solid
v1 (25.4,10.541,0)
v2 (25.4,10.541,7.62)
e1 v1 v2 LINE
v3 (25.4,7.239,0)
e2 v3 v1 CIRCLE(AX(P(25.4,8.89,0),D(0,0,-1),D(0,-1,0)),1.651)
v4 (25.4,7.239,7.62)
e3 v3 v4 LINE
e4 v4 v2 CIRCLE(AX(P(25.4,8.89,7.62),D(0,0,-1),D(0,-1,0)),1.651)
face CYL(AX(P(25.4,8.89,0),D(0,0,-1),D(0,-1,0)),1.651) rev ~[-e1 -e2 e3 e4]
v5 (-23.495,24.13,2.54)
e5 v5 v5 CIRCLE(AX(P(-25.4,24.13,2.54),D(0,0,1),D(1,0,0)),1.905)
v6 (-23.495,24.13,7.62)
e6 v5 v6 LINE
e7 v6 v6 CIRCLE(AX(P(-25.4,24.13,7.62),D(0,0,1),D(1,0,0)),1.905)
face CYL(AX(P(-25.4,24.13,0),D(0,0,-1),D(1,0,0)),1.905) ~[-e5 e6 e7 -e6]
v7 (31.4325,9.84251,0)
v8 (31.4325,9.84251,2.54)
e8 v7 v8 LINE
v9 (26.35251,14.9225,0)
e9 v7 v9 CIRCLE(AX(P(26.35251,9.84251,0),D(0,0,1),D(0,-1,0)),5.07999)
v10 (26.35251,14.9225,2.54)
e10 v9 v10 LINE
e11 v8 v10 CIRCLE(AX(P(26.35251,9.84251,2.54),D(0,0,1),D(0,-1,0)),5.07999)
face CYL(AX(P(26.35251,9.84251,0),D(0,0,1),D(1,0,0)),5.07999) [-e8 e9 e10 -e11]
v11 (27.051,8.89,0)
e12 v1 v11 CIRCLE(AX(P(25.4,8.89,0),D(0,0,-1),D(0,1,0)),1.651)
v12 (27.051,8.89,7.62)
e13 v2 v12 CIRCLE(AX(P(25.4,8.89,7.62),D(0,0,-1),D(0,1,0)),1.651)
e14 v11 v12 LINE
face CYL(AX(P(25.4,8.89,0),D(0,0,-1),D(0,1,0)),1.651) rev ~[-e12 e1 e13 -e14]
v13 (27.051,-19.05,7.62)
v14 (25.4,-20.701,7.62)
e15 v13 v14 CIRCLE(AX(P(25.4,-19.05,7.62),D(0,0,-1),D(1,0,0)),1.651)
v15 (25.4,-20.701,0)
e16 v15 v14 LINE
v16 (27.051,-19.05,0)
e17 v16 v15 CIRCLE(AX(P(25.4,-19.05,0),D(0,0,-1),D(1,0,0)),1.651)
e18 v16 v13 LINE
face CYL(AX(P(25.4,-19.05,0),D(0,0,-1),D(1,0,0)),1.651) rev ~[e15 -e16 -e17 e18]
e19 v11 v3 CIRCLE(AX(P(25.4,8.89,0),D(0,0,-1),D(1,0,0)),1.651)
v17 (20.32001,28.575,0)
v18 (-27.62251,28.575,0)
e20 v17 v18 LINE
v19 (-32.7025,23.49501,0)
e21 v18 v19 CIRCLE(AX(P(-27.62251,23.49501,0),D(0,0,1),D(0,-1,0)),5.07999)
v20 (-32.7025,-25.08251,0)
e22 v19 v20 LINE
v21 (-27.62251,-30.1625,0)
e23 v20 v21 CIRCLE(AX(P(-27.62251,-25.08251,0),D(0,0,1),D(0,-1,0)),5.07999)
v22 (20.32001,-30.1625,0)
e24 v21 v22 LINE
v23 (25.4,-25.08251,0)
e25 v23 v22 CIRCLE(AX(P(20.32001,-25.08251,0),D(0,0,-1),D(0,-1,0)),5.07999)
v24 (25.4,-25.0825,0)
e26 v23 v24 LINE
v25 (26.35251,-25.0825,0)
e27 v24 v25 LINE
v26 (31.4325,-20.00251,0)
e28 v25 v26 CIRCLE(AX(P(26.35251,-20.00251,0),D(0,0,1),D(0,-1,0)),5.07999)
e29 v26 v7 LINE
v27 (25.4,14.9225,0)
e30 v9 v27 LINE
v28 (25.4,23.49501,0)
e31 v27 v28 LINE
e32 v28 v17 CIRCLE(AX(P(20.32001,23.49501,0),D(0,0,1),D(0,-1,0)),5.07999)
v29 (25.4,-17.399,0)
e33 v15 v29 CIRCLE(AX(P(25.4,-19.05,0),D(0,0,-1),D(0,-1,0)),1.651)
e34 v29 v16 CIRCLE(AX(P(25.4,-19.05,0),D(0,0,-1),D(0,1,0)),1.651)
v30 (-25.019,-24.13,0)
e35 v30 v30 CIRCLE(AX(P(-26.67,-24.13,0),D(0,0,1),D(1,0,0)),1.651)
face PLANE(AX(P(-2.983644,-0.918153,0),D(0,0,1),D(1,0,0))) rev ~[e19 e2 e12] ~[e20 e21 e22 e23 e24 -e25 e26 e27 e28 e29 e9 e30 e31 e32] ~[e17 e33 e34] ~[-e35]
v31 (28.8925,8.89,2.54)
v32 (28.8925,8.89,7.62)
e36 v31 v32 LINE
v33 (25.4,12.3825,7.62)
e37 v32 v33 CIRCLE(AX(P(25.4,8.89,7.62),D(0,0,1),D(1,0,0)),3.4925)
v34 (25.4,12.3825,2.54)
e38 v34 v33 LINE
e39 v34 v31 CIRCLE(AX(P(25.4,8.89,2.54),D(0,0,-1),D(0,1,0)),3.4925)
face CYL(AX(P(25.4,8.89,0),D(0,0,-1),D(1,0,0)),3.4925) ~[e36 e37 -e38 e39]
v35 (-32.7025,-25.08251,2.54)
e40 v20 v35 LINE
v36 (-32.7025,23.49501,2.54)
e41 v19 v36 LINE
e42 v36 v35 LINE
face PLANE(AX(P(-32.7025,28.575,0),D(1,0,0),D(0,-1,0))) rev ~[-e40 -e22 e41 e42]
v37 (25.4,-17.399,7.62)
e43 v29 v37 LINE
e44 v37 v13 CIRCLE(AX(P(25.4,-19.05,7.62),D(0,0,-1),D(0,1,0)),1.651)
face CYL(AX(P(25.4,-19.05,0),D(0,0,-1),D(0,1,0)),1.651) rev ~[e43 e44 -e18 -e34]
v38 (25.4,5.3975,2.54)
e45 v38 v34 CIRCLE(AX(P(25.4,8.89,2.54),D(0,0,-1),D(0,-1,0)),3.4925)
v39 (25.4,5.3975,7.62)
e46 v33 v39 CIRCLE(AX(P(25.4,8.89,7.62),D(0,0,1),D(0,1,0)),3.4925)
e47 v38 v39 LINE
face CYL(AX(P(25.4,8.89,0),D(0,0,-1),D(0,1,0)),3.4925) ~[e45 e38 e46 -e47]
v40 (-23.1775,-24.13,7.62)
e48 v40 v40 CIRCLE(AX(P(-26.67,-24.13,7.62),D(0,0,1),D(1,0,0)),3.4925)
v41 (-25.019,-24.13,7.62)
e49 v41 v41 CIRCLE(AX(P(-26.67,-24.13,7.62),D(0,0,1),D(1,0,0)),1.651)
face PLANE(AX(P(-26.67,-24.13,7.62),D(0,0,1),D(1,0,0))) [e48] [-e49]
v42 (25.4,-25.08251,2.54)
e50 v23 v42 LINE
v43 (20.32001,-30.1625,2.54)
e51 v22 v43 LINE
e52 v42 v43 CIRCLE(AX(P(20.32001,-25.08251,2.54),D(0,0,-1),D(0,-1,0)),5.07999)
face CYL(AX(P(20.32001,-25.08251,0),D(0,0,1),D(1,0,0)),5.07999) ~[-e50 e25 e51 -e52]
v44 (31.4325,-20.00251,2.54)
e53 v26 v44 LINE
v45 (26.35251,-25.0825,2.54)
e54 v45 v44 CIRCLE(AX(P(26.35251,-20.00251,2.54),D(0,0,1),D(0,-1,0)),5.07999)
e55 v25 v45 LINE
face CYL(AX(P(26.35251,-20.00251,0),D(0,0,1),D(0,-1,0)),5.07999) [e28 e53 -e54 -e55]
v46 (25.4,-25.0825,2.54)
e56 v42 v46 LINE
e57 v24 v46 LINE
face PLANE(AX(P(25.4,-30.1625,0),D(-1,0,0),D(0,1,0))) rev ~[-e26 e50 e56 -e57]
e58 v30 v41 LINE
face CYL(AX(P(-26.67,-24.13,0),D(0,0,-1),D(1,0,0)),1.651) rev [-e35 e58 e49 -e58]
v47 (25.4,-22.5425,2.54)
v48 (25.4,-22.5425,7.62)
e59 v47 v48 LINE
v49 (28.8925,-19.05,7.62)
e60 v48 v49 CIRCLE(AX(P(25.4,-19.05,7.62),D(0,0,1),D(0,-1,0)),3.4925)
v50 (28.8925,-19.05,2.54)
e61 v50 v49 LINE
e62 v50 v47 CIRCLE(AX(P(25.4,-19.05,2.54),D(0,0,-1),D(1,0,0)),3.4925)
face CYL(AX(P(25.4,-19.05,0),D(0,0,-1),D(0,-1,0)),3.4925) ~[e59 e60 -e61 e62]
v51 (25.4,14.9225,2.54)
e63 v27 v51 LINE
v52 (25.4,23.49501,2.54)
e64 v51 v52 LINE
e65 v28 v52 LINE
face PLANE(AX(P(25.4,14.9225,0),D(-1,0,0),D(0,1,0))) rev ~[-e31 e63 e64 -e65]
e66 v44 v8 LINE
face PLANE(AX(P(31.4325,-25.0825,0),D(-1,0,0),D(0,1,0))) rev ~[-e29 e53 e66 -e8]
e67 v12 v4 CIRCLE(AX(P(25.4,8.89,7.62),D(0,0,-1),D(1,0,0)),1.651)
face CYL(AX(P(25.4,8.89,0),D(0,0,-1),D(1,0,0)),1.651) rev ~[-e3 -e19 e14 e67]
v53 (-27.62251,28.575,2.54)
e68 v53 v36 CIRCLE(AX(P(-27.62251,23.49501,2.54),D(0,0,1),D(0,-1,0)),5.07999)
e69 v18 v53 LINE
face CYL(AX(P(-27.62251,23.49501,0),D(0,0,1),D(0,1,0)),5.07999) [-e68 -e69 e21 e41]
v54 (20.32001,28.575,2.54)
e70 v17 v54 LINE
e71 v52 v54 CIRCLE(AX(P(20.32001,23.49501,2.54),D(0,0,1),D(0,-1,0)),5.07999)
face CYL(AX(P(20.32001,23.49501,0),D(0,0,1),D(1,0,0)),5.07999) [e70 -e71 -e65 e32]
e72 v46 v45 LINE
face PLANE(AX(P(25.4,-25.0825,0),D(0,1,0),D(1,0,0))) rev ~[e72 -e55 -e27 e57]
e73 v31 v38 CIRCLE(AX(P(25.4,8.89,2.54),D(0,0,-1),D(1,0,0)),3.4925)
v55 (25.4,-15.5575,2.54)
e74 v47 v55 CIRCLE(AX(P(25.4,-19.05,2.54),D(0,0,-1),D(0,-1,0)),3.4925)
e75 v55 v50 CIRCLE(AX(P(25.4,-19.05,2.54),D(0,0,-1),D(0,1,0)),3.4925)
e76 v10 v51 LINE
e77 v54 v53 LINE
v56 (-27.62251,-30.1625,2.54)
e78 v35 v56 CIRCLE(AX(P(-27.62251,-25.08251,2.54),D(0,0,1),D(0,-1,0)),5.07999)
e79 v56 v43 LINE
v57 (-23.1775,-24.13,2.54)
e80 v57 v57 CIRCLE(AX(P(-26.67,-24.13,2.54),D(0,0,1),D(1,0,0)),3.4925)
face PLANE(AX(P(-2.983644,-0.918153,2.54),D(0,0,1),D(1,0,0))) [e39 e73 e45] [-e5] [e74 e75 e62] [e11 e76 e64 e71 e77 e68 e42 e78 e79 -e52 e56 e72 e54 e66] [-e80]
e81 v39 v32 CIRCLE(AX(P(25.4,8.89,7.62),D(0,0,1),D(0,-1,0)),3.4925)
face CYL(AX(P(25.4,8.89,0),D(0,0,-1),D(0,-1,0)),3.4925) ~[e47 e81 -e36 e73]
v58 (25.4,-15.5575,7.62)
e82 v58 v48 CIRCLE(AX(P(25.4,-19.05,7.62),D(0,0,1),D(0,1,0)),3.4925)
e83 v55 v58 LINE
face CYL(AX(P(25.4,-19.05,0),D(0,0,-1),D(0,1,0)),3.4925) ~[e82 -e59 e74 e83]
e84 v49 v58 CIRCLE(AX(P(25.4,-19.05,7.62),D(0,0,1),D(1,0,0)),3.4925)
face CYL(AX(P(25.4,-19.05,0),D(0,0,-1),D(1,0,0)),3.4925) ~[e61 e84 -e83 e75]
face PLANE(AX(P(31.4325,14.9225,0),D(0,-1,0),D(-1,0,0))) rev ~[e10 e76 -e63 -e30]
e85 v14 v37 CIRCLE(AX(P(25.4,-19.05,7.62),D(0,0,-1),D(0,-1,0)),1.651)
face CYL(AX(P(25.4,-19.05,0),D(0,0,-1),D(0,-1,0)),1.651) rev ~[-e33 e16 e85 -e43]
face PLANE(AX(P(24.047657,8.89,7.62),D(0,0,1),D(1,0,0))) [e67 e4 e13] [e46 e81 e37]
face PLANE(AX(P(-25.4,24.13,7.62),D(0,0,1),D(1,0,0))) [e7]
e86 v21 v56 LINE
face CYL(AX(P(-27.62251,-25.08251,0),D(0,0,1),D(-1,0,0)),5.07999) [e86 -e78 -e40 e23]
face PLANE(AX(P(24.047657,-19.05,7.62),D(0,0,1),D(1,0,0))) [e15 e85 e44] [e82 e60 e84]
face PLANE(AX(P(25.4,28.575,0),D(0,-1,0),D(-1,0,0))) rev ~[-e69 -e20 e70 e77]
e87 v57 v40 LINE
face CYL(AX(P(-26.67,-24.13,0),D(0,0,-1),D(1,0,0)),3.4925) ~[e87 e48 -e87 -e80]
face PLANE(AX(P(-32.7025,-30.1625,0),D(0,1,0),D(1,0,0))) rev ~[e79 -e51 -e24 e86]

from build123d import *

# Parameters (mm, degrees)
F1_R     = 3.4925
F1_R_2   = 1.905
F2_DEPTH = 2.54
F1_R_3   = 1.651
F3_DEPTH = 7.62
F4_R     = 5.07999


# Not quite as in the source:
# - a fillet or chamfer is up to 0.001 mm smaller than in the source, because OpenCascade refuses the exact size


with BuildPart() as f2:
    # F1 (on Top) → F2 (new body)
    with BuildSketch(Plane.XY):
        with BuildLine():
            ThreePointArc((25.4, -22.5425), (21.9075, -19.05), (25.4, -15.5575))
            Line((25.4, -15.5575), (25.4, 5.3975))
            ThreePointArc((25.4, 5.3975), (21.9075, 8.89), (25.4, 12.3825))
            Line((25.4, 12.3825), (25.4, 14.9225))
            Line((25.4, 14.9225), (25.4, 28.575))
            Line((25.4, 28.575), (-32.7025, 28.575))
            Line((-32.7025, 28.575), (-32.7025, -30.1625))
            Line((-32.7025, -30.1625), (25.4, -30.1625))
            Line((25.4, -30.1625), (25.4, -25.0825))
            Line((25.4, -25.0825), (25.4, -22.5425))
        make_face()
        with Locations((-26.67, -24.13)):
            Circle(F1_R, mode=Mode.SUBTRACT)
        with Locations((-25.4, 24.13)):
            Circle(F1_R_2, mode=Mode.SUBTRACT)
        with BuildLine():
            ThreePointArc((25.4, -15.5575), (27.8695704333, -16.5804295667), (28.8925, -19.05))
            ThreePointArc((28.8925, -19.05), (27.8695704333, -21.5195704333), (25.4, -22.5425))
            Line((25.4, -22.5425), (25.4, -25.0825))
            Line((25.4, -25.0825), (31.4325, -25.0825))
            Line((31.4325, -25.0825), (31.4325, 14.9225))
            Line((31.4325, 14.9225), (25.4, 14.9225))
            Line((25.4, 14.9225), (25.4, 12.3825))
            ThreePointArc((25.4, 12.3825), (27.8695704333, 11.3595704333), (28.8925, 8.89))
            ThreePointArc((28.8925, 8.89), (27.8695704333, 6.4204295667), (25.4, 5.3975))
            Line((25.4, 5.3975), (25.4, -15.5575))
        make_face()
    extrude(amount=F2_DEPTH)

    # F1 (on Top) → F3 (join)
    with BuildSketch(Plane.XY):
        with Locations((-26.67, -24.13)):
            Circle(F1_R)
        with Locations((-26.67, -24.13)):
            Circle(F1_R_3, mode=Mode.SUBTRACT)
        with Locations((-25.4, 24.13)):
            Circle(F1_R_2)
        with BuildLine():
            ThreePointArc((25.4, 12.3825), (21.9075, 8.89), (25.4, 5.3975))
            Line((25.4, 5.3975), (25.4, 7.239))
            ThreePointArc((25.4, 7.239), (23.749, 8.89), (25.4, 10.541))
            Line((25.4, 10.541), (25.4, 12.3825))
        make_face()
        with BuildLine():
            Line((25.4, 7.239), (25.4, 5.3975))
            ThreePointArc((25.4, 5.3975), (27.8695704333, 6.4204295667), (28.8925, 8.89))
            ThreePointArc((28.8925, 8.89), (27.8695704333, 11.3595704333), (25.4, 12.3825))
            Line((25.4, 12.3825), (25.4, 10.541))
            ThreePointArc((25.4, 10.541), (26.5674332957, 10.0574332957), (27.051, 8.89))
            ThreePointArc((27.051, 8.89), (26.5674332957, 7.7225667043), (25.4, 7.239))
        make_face()
        with BuildLine():
            Line((25.4, -17.399), (25.4, -15.5575))
            ThreePointArc((25.4, -15.5575), (21.9075, -19.05), (25.4, -22.5425))
            Line((25.4, -22.5425), (25.4, -20.701))
            ThreePointArc((25.4, -20.701), (23.749, -19.05), (25.4, -17.399))
        make_face()
        with BuildLine():
            ThreePointArc((25.4, -22.5425), (27.8695704333, -21.5195704333), (28.8925, -19.05))
            ThreePointArc((28.8925, -19.05), (27.8695704333, -16.5804295667), (25.4, -15.5575))
            Line((25.4, -15.5575), (25.4, -17.399))
            ThreePointArc((25.4, -17.399), (26.5674332957, -17.8825667043), (27.051, -19.05))
            ThreePointArc((27.051, -19.05), (26.5674332957, -20.2174332957), (25.4, -20.701))
            Line((25.4, -20.701), (25.4, -22.5425))
        make_face()
    extrude(amount=F3_DEPTH)

    # F4 (radius 5.08 in the source; OpenCascade refuses exactly that, so slightly less here)
    f4_edges = [f2.edges().sort_by_distance(p)[0] for p in [
        (-32.7025, -30.1625, 1.27),
        (25.4, -30.1625, 1.27),
        (31.4325, -25.0825, 1.27),
        (31.4325, 14.9225, 1.27),
        (25.4, 28.575, 1.27),
        (-32.7025, 28.575, 1.27),
    ]]
    fillet(f4_edges, radius=F4_R)


solid = f2.part
